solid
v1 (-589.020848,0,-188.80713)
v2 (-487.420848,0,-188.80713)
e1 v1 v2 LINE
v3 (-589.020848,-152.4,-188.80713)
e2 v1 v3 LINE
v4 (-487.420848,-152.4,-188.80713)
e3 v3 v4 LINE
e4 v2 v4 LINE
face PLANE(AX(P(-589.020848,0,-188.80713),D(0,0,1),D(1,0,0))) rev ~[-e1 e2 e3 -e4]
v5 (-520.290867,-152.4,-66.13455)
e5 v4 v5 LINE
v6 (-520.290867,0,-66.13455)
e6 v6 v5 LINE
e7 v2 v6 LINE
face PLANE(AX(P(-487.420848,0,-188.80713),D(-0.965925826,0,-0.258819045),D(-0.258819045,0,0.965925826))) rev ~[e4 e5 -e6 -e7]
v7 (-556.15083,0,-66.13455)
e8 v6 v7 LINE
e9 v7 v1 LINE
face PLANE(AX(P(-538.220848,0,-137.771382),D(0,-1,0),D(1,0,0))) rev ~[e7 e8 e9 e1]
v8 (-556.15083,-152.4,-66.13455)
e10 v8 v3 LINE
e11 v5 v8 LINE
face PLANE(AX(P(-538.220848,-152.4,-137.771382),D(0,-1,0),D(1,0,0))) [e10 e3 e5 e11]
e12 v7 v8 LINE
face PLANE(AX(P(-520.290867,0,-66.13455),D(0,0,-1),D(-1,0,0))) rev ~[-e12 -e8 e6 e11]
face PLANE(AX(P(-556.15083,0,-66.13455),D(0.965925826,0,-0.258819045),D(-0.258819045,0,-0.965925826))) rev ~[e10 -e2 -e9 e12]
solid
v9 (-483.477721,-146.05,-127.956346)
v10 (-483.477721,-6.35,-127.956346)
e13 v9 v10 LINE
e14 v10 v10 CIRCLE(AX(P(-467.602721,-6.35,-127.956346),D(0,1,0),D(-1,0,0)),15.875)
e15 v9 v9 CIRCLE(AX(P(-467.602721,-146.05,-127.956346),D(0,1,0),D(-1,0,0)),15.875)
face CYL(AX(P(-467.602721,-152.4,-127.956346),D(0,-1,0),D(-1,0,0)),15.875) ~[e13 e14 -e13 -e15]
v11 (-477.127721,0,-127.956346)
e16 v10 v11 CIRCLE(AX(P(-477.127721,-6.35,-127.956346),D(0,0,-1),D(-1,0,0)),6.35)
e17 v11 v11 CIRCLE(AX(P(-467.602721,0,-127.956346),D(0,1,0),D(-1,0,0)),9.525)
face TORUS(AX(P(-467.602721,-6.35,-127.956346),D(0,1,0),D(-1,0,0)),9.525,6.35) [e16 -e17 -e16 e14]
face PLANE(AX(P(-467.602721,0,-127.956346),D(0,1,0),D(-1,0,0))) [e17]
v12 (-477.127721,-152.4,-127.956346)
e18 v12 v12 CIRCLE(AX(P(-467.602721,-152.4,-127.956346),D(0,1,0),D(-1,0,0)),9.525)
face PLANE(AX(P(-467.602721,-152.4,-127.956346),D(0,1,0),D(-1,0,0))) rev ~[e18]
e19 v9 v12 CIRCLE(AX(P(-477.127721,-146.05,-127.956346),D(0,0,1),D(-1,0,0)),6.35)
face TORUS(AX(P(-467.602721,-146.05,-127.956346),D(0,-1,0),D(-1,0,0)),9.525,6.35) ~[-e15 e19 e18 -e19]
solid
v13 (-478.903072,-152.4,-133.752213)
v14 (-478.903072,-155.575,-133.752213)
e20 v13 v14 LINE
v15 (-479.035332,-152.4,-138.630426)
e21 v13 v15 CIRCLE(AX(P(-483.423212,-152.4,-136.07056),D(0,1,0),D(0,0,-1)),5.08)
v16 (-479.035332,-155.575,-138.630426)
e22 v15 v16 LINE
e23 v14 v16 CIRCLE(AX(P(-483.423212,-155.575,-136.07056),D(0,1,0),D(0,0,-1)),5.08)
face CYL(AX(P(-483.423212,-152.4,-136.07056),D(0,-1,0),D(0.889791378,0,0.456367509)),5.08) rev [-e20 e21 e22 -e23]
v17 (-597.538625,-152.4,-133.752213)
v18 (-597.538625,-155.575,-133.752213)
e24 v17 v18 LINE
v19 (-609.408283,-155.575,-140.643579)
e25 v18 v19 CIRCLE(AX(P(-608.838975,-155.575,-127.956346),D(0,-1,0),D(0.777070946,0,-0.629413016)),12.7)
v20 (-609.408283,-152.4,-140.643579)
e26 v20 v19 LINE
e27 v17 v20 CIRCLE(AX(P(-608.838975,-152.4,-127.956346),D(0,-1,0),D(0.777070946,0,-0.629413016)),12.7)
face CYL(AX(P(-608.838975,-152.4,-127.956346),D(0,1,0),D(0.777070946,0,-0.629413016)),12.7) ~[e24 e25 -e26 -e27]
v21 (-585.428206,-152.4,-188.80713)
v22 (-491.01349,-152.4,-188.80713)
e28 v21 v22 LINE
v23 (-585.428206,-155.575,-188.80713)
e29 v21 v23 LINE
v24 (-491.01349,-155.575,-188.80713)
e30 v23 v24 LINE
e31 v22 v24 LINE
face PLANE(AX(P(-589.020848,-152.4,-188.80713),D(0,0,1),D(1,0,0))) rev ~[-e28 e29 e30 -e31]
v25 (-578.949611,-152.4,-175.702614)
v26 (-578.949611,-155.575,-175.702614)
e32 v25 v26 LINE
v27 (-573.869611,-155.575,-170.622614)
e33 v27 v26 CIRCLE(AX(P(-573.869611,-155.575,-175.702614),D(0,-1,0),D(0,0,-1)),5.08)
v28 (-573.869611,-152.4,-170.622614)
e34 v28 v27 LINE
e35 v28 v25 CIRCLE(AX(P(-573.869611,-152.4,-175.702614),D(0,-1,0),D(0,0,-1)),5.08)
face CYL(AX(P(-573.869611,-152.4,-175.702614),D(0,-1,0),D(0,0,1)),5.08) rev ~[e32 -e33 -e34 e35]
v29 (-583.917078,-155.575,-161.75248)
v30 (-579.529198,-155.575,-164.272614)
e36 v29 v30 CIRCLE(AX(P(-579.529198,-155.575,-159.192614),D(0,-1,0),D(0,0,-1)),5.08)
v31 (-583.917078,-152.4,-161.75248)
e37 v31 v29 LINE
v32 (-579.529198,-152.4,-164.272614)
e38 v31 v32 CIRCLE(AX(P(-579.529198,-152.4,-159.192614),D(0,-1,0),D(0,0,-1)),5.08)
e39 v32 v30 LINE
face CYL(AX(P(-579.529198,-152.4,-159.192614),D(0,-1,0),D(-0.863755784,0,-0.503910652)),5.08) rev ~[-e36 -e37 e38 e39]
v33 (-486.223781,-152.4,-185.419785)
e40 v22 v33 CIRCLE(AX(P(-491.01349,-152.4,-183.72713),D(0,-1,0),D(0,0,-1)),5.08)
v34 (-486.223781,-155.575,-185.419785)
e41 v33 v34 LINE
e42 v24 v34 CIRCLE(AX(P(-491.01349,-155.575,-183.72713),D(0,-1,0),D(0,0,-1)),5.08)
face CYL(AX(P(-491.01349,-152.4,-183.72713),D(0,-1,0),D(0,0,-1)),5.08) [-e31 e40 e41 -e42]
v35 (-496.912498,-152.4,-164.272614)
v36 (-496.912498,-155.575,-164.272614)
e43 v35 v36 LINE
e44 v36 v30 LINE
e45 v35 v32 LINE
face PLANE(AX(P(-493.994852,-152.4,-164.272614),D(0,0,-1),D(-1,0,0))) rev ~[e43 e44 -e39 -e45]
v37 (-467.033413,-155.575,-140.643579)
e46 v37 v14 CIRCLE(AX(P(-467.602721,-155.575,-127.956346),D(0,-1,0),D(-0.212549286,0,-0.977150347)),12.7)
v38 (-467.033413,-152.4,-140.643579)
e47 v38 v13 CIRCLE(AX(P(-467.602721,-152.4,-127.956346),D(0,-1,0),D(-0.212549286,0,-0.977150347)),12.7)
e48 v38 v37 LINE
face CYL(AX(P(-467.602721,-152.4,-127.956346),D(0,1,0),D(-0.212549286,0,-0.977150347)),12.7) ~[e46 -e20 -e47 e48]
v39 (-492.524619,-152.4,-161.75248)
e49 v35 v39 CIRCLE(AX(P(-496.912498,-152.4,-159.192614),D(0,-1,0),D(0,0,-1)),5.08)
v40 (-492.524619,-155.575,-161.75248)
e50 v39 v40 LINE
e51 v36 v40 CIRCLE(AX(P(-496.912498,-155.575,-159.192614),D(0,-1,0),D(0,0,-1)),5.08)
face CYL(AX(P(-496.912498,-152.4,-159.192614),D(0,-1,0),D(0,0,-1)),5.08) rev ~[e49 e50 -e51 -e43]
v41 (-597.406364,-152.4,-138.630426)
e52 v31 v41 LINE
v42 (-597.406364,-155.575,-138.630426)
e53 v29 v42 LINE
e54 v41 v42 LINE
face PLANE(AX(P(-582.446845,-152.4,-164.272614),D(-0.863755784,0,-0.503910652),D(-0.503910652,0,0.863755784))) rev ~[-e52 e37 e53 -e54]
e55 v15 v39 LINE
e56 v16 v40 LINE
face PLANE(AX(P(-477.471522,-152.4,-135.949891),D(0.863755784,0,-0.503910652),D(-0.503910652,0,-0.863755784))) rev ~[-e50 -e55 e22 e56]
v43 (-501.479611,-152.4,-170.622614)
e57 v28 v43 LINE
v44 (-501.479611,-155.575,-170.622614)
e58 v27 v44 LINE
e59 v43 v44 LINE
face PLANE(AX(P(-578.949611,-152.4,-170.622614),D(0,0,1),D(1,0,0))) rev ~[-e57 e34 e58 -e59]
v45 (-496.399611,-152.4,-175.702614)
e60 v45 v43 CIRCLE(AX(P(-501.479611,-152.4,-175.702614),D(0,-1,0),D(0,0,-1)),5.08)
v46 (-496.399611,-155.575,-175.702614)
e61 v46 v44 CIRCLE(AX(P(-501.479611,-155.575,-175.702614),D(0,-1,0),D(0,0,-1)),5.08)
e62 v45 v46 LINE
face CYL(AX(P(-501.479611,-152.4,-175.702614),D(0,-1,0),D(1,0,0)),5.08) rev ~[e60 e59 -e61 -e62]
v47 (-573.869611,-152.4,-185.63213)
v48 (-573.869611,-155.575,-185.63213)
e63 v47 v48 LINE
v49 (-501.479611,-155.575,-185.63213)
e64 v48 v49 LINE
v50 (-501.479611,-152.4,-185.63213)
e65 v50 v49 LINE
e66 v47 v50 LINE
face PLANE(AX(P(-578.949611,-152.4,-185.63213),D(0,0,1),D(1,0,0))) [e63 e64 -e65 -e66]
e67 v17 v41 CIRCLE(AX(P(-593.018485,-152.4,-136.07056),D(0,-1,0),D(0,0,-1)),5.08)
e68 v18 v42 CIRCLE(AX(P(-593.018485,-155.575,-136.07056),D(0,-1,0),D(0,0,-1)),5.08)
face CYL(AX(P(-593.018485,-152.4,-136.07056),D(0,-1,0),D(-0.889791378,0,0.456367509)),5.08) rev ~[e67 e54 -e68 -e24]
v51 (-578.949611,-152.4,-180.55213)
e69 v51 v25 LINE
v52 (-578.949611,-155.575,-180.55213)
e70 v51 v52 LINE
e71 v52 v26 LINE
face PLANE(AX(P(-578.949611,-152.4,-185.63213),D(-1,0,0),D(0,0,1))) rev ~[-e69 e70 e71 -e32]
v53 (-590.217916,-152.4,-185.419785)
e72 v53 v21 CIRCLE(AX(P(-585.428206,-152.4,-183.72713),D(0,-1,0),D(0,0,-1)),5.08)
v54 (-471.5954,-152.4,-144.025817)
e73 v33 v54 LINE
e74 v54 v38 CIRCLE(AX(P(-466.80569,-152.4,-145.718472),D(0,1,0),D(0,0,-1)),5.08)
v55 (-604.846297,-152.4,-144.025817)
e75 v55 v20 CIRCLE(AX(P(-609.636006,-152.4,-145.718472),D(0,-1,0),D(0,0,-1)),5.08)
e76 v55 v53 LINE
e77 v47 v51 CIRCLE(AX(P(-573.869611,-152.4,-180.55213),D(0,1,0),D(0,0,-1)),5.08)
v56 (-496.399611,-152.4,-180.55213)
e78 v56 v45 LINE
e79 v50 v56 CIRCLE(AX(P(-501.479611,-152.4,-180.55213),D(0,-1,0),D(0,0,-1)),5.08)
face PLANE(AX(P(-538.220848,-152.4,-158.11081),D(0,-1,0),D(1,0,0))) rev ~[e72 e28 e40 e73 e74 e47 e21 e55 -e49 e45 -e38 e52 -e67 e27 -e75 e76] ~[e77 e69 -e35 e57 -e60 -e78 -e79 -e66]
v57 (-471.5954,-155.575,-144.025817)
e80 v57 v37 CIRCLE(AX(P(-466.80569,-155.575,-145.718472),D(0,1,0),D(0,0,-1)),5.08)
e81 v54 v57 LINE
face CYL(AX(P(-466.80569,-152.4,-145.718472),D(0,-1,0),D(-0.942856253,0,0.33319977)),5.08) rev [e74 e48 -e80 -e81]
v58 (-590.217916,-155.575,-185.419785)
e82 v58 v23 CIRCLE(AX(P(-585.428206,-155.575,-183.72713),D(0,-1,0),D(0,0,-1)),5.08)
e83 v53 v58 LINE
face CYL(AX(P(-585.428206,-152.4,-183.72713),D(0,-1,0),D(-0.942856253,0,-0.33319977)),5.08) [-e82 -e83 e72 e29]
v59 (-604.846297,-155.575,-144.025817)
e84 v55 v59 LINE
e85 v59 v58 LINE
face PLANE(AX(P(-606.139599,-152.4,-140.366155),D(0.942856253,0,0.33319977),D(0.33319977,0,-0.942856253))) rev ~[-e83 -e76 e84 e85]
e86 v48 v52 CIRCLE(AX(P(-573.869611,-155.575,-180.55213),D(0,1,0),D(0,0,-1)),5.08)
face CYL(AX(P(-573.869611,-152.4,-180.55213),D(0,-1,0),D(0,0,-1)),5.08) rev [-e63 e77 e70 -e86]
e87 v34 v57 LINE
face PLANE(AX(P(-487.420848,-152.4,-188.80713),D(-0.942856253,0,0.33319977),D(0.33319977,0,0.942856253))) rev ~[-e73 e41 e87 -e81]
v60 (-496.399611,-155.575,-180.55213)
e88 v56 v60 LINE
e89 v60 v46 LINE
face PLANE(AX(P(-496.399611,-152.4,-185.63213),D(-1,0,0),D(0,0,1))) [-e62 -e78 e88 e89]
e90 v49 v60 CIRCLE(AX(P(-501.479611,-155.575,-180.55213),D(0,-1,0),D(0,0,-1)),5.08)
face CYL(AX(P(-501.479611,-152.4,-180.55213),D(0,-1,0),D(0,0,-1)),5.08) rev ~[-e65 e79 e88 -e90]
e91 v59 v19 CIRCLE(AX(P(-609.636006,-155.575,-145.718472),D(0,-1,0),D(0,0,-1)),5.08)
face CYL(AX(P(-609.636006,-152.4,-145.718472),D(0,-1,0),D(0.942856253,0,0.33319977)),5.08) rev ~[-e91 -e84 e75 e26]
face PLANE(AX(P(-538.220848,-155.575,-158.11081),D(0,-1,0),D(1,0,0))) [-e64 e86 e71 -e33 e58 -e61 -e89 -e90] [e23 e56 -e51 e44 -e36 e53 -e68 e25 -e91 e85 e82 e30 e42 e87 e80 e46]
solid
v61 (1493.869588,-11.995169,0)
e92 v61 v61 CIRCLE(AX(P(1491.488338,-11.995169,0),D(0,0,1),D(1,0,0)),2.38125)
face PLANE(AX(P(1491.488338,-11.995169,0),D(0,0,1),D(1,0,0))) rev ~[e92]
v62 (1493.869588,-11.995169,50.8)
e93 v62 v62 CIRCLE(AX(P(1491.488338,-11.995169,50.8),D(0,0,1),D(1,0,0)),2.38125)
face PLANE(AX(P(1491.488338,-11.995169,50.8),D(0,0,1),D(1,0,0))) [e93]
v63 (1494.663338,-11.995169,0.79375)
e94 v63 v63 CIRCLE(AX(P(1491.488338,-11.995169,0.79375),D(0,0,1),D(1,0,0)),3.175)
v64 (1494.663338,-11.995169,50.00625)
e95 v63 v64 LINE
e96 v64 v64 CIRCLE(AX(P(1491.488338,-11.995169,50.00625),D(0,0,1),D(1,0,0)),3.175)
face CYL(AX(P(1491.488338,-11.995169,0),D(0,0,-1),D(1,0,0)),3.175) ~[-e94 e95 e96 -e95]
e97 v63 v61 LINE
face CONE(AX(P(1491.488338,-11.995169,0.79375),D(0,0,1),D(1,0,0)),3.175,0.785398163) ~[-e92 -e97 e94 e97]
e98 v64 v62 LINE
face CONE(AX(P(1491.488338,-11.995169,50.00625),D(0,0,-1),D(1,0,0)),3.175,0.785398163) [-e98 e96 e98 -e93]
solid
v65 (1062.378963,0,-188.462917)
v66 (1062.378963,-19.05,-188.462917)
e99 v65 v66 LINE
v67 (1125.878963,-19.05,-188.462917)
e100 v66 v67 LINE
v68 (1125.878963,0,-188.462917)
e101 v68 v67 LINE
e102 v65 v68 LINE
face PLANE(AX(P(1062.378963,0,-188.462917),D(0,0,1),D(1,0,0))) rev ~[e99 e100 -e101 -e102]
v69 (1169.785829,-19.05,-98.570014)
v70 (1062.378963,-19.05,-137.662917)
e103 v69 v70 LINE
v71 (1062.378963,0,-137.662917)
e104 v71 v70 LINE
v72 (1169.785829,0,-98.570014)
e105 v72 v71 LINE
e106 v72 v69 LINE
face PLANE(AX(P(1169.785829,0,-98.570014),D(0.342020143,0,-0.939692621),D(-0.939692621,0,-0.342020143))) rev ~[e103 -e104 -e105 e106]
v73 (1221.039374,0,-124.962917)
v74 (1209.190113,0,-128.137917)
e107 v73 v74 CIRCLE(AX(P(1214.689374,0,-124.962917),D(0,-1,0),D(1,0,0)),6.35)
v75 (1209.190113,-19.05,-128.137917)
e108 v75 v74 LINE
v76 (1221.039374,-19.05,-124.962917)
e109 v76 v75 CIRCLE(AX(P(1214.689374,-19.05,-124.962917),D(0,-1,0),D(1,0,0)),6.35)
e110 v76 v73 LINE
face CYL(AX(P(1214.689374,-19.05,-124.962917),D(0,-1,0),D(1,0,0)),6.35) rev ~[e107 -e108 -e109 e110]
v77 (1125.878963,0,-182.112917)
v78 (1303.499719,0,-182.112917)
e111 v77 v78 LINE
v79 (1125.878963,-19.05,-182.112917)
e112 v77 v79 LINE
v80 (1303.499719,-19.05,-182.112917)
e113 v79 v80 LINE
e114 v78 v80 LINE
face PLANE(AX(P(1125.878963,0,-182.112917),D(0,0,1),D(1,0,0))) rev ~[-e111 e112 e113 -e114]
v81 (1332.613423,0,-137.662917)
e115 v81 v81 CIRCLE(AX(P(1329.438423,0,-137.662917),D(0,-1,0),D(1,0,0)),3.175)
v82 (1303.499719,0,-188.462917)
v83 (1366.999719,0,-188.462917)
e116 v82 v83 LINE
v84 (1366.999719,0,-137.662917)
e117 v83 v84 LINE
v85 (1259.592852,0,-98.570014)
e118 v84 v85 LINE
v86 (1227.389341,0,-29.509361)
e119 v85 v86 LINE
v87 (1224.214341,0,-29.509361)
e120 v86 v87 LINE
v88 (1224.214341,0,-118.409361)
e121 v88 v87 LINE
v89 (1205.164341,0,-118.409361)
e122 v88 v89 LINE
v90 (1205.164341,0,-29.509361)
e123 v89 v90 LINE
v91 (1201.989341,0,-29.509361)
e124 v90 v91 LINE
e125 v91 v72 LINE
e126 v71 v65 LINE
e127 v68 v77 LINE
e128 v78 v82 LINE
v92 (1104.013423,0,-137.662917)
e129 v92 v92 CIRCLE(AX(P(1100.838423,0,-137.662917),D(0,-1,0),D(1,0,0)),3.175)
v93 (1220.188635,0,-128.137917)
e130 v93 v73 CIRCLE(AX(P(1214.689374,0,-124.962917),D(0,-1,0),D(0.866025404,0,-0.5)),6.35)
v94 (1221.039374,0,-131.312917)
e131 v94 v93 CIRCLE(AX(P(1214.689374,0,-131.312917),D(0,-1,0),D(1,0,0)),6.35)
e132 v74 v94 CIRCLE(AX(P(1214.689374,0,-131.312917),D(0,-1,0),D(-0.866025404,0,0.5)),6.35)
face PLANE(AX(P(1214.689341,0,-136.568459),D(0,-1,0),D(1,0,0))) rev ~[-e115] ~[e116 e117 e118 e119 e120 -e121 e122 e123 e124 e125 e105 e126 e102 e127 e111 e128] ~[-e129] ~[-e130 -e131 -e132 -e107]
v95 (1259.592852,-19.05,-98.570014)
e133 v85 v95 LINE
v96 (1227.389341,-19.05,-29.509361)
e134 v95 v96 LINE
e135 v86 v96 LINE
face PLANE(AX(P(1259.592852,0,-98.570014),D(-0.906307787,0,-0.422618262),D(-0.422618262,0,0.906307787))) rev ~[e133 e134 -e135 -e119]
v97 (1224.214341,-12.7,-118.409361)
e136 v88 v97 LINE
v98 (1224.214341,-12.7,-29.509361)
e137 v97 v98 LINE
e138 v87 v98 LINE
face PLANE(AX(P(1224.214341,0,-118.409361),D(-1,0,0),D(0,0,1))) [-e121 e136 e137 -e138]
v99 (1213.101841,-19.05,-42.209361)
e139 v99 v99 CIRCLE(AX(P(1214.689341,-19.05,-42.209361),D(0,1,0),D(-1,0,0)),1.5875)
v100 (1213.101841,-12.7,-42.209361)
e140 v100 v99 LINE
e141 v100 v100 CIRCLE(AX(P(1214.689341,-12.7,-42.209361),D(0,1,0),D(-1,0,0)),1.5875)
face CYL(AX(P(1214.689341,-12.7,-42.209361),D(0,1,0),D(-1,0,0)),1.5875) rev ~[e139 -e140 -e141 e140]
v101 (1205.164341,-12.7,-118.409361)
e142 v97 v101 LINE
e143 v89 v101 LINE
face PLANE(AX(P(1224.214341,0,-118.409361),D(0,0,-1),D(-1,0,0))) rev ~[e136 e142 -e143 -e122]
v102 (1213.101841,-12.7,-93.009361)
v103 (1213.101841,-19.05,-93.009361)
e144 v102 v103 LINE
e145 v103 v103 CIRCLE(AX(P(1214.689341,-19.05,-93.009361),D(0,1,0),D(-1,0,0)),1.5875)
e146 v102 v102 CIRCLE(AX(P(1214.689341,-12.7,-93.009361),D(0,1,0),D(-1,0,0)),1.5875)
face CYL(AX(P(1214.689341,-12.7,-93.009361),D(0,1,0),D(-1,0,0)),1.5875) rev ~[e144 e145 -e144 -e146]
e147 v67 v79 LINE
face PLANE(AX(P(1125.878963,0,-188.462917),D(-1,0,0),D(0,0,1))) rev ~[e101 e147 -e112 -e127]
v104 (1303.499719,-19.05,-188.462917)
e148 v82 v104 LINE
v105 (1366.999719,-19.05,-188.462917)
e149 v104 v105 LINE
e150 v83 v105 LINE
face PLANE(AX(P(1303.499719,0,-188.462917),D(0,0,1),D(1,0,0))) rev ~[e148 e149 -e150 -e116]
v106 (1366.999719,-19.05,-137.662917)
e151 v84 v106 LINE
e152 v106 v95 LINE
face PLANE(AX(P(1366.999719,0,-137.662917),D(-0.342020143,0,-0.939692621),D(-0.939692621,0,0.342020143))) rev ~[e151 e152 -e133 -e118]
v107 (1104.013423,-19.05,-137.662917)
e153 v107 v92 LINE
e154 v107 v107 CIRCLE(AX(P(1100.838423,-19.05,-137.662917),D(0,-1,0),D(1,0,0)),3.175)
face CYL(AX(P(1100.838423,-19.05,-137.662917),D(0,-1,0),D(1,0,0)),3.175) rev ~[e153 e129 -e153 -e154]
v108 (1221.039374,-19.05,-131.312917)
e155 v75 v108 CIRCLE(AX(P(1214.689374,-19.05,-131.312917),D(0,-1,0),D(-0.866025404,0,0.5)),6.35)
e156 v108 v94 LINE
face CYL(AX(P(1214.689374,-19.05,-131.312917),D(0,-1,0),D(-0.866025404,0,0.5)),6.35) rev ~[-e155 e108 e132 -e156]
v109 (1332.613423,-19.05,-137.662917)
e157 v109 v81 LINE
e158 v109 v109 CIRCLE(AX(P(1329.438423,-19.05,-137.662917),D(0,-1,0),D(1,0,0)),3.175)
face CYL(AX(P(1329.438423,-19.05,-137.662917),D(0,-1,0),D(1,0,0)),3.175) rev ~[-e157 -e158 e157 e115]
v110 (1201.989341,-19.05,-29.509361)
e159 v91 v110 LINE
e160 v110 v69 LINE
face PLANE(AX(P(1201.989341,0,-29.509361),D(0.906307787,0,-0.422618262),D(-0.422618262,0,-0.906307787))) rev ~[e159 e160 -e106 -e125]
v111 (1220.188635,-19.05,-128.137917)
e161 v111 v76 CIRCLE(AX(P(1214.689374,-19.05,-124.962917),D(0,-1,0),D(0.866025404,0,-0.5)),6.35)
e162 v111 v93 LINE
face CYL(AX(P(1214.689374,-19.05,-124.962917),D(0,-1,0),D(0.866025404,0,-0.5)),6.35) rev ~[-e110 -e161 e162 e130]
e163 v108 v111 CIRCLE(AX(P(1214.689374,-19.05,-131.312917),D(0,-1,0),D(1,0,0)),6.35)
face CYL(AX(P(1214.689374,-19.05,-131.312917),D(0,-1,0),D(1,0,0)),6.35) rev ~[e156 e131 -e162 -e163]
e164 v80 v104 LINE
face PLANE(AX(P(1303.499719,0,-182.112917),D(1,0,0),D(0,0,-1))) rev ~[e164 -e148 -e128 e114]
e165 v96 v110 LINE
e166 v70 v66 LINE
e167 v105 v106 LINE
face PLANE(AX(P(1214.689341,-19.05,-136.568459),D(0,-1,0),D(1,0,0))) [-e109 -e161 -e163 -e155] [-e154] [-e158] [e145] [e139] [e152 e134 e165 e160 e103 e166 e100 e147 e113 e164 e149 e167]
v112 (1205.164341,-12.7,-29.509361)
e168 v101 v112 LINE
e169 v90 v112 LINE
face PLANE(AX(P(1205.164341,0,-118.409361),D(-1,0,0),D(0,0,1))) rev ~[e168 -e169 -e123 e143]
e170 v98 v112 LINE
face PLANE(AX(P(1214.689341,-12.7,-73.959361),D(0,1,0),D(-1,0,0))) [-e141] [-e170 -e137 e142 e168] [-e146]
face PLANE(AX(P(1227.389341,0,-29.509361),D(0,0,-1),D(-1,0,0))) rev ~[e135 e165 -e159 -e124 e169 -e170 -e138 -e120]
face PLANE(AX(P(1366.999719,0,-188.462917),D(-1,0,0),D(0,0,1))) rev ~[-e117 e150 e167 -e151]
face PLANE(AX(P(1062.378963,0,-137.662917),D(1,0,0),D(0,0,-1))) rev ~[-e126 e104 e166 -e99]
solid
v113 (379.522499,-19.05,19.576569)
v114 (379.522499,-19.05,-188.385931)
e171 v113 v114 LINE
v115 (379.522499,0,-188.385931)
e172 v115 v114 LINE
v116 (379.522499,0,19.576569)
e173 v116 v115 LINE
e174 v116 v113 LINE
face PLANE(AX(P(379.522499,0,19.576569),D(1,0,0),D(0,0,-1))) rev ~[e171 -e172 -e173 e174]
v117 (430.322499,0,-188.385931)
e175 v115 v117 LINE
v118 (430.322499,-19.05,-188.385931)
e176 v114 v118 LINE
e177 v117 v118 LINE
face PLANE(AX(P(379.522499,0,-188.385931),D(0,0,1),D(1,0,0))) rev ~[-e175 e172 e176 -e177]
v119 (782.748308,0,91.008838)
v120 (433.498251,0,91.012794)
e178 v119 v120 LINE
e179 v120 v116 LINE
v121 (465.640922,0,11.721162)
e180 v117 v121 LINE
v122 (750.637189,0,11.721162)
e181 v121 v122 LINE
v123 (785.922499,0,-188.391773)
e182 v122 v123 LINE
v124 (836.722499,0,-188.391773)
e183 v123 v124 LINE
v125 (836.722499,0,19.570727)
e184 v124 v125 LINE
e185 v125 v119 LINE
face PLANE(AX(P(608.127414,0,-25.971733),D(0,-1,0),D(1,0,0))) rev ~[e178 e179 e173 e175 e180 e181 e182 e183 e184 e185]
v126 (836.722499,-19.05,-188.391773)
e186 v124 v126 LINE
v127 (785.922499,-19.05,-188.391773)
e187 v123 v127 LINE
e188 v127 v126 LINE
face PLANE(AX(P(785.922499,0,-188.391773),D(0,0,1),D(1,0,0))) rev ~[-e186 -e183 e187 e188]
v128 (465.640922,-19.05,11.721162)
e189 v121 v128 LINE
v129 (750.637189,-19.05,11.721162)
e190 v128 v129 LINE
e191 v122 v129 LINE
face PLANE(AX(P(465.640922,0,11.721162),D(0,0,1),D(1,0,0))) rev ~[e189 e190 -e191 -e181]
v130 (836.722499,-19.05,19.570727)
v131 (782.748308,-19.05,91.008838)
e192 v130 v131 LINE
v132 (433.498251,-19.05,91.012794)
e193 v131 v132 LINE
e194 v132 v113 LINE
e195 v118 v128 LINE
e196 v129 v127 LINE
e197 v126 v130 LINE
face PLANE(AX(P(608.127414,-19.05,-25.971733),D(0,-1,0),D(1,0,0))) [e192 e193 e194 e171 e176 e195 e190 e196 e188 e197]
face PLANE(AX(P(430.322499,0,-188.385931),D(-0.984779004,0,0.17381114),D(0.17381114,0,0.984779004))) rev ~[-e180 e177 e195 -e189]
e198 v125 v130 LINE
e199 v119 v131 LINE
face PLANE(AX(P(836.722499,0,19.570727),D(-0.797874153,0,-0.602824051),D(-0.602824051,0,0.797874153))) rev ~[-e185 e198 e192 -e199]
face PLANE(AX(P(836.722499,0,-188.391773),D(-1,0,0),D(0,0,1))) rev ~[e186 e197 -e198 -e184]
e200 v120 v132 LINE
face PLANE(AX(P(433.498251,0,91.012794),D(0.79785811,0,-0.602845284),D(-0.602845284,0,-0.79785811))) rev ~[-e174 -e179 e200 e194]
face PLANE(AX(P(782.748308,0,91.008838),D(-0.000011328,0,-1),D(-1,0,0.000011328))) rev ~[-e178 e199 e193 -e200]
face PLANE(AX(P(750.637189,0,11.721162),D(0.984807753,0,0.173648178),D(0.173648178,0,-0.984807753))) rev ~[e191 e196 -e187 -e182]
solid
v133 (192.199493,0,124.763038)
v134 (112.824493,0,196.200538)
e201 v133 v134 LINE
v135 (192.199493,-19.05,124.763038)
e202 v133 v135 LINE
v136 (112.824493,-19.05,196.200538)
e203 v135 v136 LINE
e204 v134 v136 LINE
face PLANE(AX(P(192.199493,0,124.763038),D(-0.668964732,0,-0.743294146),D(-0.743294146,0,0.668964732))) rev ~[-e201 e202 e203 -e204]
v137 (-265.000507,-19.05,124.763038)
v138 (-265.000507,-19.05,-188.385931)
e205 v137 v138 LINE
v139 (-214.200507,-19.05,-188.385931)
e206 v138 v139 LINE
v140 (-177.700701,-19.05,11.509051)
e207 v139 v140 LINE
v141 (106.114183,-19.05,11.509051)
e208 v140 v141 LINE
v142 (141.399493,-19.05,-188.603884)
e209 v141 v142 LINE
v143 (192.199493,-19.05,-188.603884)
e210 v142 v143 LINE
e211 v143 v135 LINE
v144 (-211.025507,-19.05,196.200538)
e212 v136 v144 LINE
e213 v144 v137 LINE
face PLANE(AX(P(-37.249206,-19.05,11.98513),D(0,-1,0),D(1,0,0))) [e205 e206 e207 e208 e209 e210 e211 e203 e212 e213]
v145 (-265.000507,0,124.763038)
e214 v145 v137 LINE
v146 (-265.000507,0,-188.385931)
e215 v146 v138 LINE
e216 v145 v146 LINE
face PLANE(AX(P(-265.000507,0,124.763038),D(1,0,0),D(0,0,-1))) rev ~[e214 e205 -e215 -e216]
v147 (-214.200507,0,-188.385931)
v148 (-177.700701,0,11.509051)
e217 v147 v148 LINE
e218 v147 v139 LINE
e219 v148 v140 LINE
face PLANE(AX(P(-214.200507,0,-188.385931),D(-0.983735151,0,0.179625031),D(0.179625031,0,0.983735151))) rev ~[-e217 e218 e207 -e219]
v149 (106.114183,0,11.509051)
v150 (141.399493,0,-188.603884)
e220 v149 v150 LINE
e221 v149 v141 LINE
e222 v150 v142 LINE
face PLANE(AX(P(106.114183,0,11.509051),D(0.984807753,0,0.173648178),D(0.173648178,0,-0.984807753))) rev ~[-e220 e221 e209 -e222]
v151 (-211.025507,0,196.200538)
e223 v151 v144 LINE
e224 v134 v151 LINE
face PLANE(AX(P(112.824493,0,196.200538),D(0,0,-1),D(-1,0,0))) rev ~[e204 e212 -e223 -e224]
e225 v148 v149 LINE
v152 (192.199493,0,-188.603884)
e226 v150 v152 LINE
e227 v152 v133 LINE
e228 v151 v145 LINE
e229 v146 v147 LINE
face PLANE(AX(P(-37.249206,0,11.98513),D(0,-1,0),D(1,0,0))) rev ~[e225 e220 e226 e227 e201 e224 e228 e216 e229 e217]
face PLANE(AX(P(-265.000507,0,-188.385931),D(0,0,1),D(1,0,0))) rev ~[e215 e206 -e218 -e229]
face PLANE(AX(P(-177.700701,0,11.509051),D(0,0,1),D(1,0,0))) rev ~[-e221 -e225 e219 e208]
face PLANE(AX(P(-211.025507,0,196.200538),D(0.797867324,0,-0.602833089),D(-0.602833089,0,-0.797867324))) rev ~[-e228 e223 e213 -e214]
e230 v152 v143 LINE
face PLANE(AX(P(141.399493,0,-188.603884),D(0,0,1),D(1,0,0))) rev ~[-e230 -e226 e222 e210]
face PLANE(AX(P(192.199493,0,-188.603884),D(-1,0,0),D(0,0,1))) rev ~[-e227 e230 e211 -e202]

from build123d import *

# Parameters (mm, degrees)
F1_DEPTH  = 19.05
F2_R      = 3.175
F3_DEPTH  = 19.05
F4_W      = 19.05
F4_H      = 88.9
F5_DEPTH  = 12.7
F6_R      = 1.5875
F7_DEPTH  = 6.35
F8_R      = 3.175
F9_DEPTH  = 50.8
F10_SIZE  = 0.79375
F12_DEPTH = 152.4
F13_W     = 82.55
F13_H     = 15.0095159877
F14_DEPTH = 3.175
F15_R     = 5.08
F16_R     = 15.875
F17_DEPTH = 152.4
F18_R     = 6.35


# Not quite as in the source:
# - a feature names something its author has since deleted; it is built from what else it names


with BuildPart() as f1:
    # F0 (on Front) → F1 (new body)
    with BuildSketch(Plane.XZ):
        Polygon((106.1141828492, 11.5090513026), (141.3994925511, -188.6038841095), (192.1994925511, -188.6038841095), (192.1994925511, 124.7630377858), (112.8244925511, 196.2005377858), (-211.0255074489, 196.2005377858), (-265.0005074489, 124.7630377858), (-265.0005074489, -188.3859314735), (-214.2005074489, -188.3859314735), (-177.7007011349, 11.5090513026), align=None)
    extrude(amount=F1_DEPTH)


with BuildPart() as f1b:
    # F0 (on Front) → F1, piece 2 (new body)
    with BuildSketch(Plane.XZ):
        Polygon((750.637189092, 11.7211622333), (785.922498794, -188.3917731787), (836.722498794, -188.3917731787), (836.722498794, 19.5707268213), (782.7483080176, 91.0088382275), (433.4982512736, 91.0127944155), (379.522498794, 19.5765685265), (379.522498794, -188.3859314735), (430.322498794, -188.3859314735), (465.6409224309, 11.7211622333), align=None)
    extrude(amount=F1_DEPTH)


with BuildPart() as f1c:
    # F0 (on Front) → F1, piece 3 (new body)
    with BuildSketch(Plane.XZ):
        Polygon((1062.3789626762, -137.6629166841), (1062.3789626762, -188.4629166841), (1125.8789626762, -188.4629166841), (1125.8789626762, -182.1129166841), (1303.4997188771, -182.1129166841), (1303.4997188771, -188.4629166841), (1366.9997188771, -188.4629166841), (1366.9997188771, -137.6629166841), (1259.5928523213, -98.570014302), (1227.3893407766, -29.5093609298), (1201.9893407766, -29.5093609298), (1169.785829232, -98.570014302), align=None)
    extrude(amount=F1_DEPTH)

    # F2 (on face) → F3 (cut, through all)
    with BuildSketch(Plane.XZ.offset(19.05)):
        with Locations((1100.8384227753, -137.6629166841)):
            Circle(F2_R)
        with Locations((1329.4384227753, -137.6629166841)):
            Circle(F2_R)
        with BuildLine():
            ThreePointArc((1209.190112656, -128.1379166841), (1213.0458730336, -137.446545681), (1221.03937397, -131.3129166841))
            ThreePointArc((1221.03937397, -131.3129166841), (1220.823002967, -129.6694157477), (1220.1886352841, -128.1379166841))
            ThreePointArc((1220.1886352841, -128.1379166841), (1214.68937397, -131.3129166841), (1209.190112656, -128.1379166841))
        make_face()
        with BuildLine():
            ThreePointArc((1209.190112656, -128.1379166841), (1214.68937397, -131.3129166841), (1220.1886352841, -128.1379166841))
            ThreePointArc((1220.1886352841, -128.1379166841), (1214.68937397, -124.9629166841), (1209.190112656, -128.1379166841))
        make_face()
        with BuildLine():
            ThreePointArc((1209.190112656, -128.1379166841), (1214.68937397, -124.9629166841), (1220.1886352841, -128.1379166841))
            ThreePointArc((1220.1886352841, -128.1379166841), (1220.823002967, -126.6064176205), (1221.03937397, -124.9629166841))
            ThreePointArc((1221.03937397, -124.9629166841), (1213.0458730336, -118.8292876871), (1209.190112656, -128.1379166841))
        make_face()
    extrude(amount=-F3_DEPTH, mode=Mode.SUBTRACT)

    # F4 (on face) → F5 (cut)
    with BuildSketch(Plane(origin=(0, 0, 0), x_dir=(-1, 0, 0), z_dir=(0, 1, 0))):
        with Locations((-1214.6893407766, -73.9593609298)):
            Rectangle(F4_W, F4_H)
    extrude(amount=-F5_DEPTH, mode=Mode.SUBTRACT)

    # F6 (on face) → F7 (cut, through all)
    with BuildSketch(Plane(origin=(0, -12.7, 0), x_dir=(-1, 0, 0), z_dir=(0, 1, 0))):
        with Locations((-1214.6893407766, -42.2093609298)):
            Circle(F6_R)
        with Locations((-1214.6893407766, -93.0093609298)):
            Circle(F6_R)
    extrude(amount=-F7_DEPTH, mode=Mode.SUBTRACT)


with BuildPart() as f9:
    # F8 (on Top) → F9 (new body)
    with BuildSketch(Plane.XY):
        with Locations((1491.4883375168, -11.9951693341)):
            Circle(F8_R)
    extrude(amount=F9_DEPTH)

    # F10
    f10_edges = [f9.edges().sort_by_distance(p)[0] for p in [
        (1488.313338, -11.995169, 50.8),
        (1488.313338, -11.995169, 0),
    ]]
    chamfer(f10_edges, length=F10_SIZE)


with BuildPart() as f12:
    # F11 (on Front) → F12 (new body)
    with BuildSketch(Plane.XZ):
        Polygon((-589.0208482742, -188.8071298599), (-487.4208482742, -188.8071298599), (-520.2908670023, -66.1345499212), (-556.1508295462, -66.1345499212), align=None)
    extrude(amount=F12_DEPTH)


with BuildPart() as f14:
    # F13 (on face) → F14 (new body)
    with BuildSketch(Plane.XZ.offset(152.4)):
        with BuildLine():
            Line((-606.1395994957, -140.3661550864), (-589.0208482742, -188.8071298599))
            Line((-589.0208482742, -188.8071298599), (-487.4208482742, -188.8071298599))
            Line((-487.4208482742, -188.8071298599), (-470.3020970528, -140.3661550864))
            ThreePointArc((-470.3020970528, -140.3661550864), (-460.941969274, -117.143187727), (-477.4715221366, -135.9498909781))
            Line((-477.4715221366, -135.9498909781), (-493.9948520198, -164.2726138722))
            Line((-493.9948520198, -164.2726138722), (-582.4468445286, -164.2726138722))
            Line((-582.4468445286, -164.2726138722), (-598.9701744119, -135.9498909781))
            ThreePointArc((-598.9701744119, -135.9498909781), (-615.4997272745, -117.143187727), (-606.1395994957, -140.3661550864))
        make_face()
        with Locations((-537.6746112347, -178.1273718661)):
            Rectangle(F13_W, F13_H, mode=Mode.SUBTRACT)
    extrude(amount=F14_DEPTH)

    # F15
    f15_edges = [f14.edges().sort_by_distance(p)[0] for p in [
        (-598.970174, -153.9875, -135.949891),
        (-606.139599, -153.9875, -140.366155),
        (-582.446845, -153.9875, -164.272614),
        (-589.020848, -153.9875, -188.80713),
        (-578.949611, -153.9875, -170.622614),
        (-578.949611, -153.9875, -185.63213),
        (-496.399611, -153.9875, -170.622614),
        (-496.399611, -153.9875, -185.63213),
        (-493.994852, -153.9875, -164.272614),
        (-487.420848, -153.9875, -188.80713),
        (-470.302097, -153.9875, -140.366155),
        (-477.471522, -153.9875, -135.949891),
    ]]
    fillet(f15_edges, radius=F15_R)


with BuildPart() as f17:
    # F16 (on face) → F17 (new body)
    with BuildSketch(Plane(origin=(0, -152.4, 0), x_dir=(-1, 0, 0), z_dir=(0, 1, 0))):
        with Locations((467.6027211189, -127.9563456774)):
            Circle(F16_R)
    extrude(amount=F17_DEPTH)

    # F18
    f18_edges = [f17.edges().sort_by_distance(p)[0] for p in [
        (-451.727721, -152.4, -127.956346),
        (-451.727721, 0, -127.956346),
    ]]
    fillet(f18_edges, radius=F18_R)


solid = Compound([f1.part, f1b.part, f1c.part, f9.part, f12.part, f14.part, f17.part])
